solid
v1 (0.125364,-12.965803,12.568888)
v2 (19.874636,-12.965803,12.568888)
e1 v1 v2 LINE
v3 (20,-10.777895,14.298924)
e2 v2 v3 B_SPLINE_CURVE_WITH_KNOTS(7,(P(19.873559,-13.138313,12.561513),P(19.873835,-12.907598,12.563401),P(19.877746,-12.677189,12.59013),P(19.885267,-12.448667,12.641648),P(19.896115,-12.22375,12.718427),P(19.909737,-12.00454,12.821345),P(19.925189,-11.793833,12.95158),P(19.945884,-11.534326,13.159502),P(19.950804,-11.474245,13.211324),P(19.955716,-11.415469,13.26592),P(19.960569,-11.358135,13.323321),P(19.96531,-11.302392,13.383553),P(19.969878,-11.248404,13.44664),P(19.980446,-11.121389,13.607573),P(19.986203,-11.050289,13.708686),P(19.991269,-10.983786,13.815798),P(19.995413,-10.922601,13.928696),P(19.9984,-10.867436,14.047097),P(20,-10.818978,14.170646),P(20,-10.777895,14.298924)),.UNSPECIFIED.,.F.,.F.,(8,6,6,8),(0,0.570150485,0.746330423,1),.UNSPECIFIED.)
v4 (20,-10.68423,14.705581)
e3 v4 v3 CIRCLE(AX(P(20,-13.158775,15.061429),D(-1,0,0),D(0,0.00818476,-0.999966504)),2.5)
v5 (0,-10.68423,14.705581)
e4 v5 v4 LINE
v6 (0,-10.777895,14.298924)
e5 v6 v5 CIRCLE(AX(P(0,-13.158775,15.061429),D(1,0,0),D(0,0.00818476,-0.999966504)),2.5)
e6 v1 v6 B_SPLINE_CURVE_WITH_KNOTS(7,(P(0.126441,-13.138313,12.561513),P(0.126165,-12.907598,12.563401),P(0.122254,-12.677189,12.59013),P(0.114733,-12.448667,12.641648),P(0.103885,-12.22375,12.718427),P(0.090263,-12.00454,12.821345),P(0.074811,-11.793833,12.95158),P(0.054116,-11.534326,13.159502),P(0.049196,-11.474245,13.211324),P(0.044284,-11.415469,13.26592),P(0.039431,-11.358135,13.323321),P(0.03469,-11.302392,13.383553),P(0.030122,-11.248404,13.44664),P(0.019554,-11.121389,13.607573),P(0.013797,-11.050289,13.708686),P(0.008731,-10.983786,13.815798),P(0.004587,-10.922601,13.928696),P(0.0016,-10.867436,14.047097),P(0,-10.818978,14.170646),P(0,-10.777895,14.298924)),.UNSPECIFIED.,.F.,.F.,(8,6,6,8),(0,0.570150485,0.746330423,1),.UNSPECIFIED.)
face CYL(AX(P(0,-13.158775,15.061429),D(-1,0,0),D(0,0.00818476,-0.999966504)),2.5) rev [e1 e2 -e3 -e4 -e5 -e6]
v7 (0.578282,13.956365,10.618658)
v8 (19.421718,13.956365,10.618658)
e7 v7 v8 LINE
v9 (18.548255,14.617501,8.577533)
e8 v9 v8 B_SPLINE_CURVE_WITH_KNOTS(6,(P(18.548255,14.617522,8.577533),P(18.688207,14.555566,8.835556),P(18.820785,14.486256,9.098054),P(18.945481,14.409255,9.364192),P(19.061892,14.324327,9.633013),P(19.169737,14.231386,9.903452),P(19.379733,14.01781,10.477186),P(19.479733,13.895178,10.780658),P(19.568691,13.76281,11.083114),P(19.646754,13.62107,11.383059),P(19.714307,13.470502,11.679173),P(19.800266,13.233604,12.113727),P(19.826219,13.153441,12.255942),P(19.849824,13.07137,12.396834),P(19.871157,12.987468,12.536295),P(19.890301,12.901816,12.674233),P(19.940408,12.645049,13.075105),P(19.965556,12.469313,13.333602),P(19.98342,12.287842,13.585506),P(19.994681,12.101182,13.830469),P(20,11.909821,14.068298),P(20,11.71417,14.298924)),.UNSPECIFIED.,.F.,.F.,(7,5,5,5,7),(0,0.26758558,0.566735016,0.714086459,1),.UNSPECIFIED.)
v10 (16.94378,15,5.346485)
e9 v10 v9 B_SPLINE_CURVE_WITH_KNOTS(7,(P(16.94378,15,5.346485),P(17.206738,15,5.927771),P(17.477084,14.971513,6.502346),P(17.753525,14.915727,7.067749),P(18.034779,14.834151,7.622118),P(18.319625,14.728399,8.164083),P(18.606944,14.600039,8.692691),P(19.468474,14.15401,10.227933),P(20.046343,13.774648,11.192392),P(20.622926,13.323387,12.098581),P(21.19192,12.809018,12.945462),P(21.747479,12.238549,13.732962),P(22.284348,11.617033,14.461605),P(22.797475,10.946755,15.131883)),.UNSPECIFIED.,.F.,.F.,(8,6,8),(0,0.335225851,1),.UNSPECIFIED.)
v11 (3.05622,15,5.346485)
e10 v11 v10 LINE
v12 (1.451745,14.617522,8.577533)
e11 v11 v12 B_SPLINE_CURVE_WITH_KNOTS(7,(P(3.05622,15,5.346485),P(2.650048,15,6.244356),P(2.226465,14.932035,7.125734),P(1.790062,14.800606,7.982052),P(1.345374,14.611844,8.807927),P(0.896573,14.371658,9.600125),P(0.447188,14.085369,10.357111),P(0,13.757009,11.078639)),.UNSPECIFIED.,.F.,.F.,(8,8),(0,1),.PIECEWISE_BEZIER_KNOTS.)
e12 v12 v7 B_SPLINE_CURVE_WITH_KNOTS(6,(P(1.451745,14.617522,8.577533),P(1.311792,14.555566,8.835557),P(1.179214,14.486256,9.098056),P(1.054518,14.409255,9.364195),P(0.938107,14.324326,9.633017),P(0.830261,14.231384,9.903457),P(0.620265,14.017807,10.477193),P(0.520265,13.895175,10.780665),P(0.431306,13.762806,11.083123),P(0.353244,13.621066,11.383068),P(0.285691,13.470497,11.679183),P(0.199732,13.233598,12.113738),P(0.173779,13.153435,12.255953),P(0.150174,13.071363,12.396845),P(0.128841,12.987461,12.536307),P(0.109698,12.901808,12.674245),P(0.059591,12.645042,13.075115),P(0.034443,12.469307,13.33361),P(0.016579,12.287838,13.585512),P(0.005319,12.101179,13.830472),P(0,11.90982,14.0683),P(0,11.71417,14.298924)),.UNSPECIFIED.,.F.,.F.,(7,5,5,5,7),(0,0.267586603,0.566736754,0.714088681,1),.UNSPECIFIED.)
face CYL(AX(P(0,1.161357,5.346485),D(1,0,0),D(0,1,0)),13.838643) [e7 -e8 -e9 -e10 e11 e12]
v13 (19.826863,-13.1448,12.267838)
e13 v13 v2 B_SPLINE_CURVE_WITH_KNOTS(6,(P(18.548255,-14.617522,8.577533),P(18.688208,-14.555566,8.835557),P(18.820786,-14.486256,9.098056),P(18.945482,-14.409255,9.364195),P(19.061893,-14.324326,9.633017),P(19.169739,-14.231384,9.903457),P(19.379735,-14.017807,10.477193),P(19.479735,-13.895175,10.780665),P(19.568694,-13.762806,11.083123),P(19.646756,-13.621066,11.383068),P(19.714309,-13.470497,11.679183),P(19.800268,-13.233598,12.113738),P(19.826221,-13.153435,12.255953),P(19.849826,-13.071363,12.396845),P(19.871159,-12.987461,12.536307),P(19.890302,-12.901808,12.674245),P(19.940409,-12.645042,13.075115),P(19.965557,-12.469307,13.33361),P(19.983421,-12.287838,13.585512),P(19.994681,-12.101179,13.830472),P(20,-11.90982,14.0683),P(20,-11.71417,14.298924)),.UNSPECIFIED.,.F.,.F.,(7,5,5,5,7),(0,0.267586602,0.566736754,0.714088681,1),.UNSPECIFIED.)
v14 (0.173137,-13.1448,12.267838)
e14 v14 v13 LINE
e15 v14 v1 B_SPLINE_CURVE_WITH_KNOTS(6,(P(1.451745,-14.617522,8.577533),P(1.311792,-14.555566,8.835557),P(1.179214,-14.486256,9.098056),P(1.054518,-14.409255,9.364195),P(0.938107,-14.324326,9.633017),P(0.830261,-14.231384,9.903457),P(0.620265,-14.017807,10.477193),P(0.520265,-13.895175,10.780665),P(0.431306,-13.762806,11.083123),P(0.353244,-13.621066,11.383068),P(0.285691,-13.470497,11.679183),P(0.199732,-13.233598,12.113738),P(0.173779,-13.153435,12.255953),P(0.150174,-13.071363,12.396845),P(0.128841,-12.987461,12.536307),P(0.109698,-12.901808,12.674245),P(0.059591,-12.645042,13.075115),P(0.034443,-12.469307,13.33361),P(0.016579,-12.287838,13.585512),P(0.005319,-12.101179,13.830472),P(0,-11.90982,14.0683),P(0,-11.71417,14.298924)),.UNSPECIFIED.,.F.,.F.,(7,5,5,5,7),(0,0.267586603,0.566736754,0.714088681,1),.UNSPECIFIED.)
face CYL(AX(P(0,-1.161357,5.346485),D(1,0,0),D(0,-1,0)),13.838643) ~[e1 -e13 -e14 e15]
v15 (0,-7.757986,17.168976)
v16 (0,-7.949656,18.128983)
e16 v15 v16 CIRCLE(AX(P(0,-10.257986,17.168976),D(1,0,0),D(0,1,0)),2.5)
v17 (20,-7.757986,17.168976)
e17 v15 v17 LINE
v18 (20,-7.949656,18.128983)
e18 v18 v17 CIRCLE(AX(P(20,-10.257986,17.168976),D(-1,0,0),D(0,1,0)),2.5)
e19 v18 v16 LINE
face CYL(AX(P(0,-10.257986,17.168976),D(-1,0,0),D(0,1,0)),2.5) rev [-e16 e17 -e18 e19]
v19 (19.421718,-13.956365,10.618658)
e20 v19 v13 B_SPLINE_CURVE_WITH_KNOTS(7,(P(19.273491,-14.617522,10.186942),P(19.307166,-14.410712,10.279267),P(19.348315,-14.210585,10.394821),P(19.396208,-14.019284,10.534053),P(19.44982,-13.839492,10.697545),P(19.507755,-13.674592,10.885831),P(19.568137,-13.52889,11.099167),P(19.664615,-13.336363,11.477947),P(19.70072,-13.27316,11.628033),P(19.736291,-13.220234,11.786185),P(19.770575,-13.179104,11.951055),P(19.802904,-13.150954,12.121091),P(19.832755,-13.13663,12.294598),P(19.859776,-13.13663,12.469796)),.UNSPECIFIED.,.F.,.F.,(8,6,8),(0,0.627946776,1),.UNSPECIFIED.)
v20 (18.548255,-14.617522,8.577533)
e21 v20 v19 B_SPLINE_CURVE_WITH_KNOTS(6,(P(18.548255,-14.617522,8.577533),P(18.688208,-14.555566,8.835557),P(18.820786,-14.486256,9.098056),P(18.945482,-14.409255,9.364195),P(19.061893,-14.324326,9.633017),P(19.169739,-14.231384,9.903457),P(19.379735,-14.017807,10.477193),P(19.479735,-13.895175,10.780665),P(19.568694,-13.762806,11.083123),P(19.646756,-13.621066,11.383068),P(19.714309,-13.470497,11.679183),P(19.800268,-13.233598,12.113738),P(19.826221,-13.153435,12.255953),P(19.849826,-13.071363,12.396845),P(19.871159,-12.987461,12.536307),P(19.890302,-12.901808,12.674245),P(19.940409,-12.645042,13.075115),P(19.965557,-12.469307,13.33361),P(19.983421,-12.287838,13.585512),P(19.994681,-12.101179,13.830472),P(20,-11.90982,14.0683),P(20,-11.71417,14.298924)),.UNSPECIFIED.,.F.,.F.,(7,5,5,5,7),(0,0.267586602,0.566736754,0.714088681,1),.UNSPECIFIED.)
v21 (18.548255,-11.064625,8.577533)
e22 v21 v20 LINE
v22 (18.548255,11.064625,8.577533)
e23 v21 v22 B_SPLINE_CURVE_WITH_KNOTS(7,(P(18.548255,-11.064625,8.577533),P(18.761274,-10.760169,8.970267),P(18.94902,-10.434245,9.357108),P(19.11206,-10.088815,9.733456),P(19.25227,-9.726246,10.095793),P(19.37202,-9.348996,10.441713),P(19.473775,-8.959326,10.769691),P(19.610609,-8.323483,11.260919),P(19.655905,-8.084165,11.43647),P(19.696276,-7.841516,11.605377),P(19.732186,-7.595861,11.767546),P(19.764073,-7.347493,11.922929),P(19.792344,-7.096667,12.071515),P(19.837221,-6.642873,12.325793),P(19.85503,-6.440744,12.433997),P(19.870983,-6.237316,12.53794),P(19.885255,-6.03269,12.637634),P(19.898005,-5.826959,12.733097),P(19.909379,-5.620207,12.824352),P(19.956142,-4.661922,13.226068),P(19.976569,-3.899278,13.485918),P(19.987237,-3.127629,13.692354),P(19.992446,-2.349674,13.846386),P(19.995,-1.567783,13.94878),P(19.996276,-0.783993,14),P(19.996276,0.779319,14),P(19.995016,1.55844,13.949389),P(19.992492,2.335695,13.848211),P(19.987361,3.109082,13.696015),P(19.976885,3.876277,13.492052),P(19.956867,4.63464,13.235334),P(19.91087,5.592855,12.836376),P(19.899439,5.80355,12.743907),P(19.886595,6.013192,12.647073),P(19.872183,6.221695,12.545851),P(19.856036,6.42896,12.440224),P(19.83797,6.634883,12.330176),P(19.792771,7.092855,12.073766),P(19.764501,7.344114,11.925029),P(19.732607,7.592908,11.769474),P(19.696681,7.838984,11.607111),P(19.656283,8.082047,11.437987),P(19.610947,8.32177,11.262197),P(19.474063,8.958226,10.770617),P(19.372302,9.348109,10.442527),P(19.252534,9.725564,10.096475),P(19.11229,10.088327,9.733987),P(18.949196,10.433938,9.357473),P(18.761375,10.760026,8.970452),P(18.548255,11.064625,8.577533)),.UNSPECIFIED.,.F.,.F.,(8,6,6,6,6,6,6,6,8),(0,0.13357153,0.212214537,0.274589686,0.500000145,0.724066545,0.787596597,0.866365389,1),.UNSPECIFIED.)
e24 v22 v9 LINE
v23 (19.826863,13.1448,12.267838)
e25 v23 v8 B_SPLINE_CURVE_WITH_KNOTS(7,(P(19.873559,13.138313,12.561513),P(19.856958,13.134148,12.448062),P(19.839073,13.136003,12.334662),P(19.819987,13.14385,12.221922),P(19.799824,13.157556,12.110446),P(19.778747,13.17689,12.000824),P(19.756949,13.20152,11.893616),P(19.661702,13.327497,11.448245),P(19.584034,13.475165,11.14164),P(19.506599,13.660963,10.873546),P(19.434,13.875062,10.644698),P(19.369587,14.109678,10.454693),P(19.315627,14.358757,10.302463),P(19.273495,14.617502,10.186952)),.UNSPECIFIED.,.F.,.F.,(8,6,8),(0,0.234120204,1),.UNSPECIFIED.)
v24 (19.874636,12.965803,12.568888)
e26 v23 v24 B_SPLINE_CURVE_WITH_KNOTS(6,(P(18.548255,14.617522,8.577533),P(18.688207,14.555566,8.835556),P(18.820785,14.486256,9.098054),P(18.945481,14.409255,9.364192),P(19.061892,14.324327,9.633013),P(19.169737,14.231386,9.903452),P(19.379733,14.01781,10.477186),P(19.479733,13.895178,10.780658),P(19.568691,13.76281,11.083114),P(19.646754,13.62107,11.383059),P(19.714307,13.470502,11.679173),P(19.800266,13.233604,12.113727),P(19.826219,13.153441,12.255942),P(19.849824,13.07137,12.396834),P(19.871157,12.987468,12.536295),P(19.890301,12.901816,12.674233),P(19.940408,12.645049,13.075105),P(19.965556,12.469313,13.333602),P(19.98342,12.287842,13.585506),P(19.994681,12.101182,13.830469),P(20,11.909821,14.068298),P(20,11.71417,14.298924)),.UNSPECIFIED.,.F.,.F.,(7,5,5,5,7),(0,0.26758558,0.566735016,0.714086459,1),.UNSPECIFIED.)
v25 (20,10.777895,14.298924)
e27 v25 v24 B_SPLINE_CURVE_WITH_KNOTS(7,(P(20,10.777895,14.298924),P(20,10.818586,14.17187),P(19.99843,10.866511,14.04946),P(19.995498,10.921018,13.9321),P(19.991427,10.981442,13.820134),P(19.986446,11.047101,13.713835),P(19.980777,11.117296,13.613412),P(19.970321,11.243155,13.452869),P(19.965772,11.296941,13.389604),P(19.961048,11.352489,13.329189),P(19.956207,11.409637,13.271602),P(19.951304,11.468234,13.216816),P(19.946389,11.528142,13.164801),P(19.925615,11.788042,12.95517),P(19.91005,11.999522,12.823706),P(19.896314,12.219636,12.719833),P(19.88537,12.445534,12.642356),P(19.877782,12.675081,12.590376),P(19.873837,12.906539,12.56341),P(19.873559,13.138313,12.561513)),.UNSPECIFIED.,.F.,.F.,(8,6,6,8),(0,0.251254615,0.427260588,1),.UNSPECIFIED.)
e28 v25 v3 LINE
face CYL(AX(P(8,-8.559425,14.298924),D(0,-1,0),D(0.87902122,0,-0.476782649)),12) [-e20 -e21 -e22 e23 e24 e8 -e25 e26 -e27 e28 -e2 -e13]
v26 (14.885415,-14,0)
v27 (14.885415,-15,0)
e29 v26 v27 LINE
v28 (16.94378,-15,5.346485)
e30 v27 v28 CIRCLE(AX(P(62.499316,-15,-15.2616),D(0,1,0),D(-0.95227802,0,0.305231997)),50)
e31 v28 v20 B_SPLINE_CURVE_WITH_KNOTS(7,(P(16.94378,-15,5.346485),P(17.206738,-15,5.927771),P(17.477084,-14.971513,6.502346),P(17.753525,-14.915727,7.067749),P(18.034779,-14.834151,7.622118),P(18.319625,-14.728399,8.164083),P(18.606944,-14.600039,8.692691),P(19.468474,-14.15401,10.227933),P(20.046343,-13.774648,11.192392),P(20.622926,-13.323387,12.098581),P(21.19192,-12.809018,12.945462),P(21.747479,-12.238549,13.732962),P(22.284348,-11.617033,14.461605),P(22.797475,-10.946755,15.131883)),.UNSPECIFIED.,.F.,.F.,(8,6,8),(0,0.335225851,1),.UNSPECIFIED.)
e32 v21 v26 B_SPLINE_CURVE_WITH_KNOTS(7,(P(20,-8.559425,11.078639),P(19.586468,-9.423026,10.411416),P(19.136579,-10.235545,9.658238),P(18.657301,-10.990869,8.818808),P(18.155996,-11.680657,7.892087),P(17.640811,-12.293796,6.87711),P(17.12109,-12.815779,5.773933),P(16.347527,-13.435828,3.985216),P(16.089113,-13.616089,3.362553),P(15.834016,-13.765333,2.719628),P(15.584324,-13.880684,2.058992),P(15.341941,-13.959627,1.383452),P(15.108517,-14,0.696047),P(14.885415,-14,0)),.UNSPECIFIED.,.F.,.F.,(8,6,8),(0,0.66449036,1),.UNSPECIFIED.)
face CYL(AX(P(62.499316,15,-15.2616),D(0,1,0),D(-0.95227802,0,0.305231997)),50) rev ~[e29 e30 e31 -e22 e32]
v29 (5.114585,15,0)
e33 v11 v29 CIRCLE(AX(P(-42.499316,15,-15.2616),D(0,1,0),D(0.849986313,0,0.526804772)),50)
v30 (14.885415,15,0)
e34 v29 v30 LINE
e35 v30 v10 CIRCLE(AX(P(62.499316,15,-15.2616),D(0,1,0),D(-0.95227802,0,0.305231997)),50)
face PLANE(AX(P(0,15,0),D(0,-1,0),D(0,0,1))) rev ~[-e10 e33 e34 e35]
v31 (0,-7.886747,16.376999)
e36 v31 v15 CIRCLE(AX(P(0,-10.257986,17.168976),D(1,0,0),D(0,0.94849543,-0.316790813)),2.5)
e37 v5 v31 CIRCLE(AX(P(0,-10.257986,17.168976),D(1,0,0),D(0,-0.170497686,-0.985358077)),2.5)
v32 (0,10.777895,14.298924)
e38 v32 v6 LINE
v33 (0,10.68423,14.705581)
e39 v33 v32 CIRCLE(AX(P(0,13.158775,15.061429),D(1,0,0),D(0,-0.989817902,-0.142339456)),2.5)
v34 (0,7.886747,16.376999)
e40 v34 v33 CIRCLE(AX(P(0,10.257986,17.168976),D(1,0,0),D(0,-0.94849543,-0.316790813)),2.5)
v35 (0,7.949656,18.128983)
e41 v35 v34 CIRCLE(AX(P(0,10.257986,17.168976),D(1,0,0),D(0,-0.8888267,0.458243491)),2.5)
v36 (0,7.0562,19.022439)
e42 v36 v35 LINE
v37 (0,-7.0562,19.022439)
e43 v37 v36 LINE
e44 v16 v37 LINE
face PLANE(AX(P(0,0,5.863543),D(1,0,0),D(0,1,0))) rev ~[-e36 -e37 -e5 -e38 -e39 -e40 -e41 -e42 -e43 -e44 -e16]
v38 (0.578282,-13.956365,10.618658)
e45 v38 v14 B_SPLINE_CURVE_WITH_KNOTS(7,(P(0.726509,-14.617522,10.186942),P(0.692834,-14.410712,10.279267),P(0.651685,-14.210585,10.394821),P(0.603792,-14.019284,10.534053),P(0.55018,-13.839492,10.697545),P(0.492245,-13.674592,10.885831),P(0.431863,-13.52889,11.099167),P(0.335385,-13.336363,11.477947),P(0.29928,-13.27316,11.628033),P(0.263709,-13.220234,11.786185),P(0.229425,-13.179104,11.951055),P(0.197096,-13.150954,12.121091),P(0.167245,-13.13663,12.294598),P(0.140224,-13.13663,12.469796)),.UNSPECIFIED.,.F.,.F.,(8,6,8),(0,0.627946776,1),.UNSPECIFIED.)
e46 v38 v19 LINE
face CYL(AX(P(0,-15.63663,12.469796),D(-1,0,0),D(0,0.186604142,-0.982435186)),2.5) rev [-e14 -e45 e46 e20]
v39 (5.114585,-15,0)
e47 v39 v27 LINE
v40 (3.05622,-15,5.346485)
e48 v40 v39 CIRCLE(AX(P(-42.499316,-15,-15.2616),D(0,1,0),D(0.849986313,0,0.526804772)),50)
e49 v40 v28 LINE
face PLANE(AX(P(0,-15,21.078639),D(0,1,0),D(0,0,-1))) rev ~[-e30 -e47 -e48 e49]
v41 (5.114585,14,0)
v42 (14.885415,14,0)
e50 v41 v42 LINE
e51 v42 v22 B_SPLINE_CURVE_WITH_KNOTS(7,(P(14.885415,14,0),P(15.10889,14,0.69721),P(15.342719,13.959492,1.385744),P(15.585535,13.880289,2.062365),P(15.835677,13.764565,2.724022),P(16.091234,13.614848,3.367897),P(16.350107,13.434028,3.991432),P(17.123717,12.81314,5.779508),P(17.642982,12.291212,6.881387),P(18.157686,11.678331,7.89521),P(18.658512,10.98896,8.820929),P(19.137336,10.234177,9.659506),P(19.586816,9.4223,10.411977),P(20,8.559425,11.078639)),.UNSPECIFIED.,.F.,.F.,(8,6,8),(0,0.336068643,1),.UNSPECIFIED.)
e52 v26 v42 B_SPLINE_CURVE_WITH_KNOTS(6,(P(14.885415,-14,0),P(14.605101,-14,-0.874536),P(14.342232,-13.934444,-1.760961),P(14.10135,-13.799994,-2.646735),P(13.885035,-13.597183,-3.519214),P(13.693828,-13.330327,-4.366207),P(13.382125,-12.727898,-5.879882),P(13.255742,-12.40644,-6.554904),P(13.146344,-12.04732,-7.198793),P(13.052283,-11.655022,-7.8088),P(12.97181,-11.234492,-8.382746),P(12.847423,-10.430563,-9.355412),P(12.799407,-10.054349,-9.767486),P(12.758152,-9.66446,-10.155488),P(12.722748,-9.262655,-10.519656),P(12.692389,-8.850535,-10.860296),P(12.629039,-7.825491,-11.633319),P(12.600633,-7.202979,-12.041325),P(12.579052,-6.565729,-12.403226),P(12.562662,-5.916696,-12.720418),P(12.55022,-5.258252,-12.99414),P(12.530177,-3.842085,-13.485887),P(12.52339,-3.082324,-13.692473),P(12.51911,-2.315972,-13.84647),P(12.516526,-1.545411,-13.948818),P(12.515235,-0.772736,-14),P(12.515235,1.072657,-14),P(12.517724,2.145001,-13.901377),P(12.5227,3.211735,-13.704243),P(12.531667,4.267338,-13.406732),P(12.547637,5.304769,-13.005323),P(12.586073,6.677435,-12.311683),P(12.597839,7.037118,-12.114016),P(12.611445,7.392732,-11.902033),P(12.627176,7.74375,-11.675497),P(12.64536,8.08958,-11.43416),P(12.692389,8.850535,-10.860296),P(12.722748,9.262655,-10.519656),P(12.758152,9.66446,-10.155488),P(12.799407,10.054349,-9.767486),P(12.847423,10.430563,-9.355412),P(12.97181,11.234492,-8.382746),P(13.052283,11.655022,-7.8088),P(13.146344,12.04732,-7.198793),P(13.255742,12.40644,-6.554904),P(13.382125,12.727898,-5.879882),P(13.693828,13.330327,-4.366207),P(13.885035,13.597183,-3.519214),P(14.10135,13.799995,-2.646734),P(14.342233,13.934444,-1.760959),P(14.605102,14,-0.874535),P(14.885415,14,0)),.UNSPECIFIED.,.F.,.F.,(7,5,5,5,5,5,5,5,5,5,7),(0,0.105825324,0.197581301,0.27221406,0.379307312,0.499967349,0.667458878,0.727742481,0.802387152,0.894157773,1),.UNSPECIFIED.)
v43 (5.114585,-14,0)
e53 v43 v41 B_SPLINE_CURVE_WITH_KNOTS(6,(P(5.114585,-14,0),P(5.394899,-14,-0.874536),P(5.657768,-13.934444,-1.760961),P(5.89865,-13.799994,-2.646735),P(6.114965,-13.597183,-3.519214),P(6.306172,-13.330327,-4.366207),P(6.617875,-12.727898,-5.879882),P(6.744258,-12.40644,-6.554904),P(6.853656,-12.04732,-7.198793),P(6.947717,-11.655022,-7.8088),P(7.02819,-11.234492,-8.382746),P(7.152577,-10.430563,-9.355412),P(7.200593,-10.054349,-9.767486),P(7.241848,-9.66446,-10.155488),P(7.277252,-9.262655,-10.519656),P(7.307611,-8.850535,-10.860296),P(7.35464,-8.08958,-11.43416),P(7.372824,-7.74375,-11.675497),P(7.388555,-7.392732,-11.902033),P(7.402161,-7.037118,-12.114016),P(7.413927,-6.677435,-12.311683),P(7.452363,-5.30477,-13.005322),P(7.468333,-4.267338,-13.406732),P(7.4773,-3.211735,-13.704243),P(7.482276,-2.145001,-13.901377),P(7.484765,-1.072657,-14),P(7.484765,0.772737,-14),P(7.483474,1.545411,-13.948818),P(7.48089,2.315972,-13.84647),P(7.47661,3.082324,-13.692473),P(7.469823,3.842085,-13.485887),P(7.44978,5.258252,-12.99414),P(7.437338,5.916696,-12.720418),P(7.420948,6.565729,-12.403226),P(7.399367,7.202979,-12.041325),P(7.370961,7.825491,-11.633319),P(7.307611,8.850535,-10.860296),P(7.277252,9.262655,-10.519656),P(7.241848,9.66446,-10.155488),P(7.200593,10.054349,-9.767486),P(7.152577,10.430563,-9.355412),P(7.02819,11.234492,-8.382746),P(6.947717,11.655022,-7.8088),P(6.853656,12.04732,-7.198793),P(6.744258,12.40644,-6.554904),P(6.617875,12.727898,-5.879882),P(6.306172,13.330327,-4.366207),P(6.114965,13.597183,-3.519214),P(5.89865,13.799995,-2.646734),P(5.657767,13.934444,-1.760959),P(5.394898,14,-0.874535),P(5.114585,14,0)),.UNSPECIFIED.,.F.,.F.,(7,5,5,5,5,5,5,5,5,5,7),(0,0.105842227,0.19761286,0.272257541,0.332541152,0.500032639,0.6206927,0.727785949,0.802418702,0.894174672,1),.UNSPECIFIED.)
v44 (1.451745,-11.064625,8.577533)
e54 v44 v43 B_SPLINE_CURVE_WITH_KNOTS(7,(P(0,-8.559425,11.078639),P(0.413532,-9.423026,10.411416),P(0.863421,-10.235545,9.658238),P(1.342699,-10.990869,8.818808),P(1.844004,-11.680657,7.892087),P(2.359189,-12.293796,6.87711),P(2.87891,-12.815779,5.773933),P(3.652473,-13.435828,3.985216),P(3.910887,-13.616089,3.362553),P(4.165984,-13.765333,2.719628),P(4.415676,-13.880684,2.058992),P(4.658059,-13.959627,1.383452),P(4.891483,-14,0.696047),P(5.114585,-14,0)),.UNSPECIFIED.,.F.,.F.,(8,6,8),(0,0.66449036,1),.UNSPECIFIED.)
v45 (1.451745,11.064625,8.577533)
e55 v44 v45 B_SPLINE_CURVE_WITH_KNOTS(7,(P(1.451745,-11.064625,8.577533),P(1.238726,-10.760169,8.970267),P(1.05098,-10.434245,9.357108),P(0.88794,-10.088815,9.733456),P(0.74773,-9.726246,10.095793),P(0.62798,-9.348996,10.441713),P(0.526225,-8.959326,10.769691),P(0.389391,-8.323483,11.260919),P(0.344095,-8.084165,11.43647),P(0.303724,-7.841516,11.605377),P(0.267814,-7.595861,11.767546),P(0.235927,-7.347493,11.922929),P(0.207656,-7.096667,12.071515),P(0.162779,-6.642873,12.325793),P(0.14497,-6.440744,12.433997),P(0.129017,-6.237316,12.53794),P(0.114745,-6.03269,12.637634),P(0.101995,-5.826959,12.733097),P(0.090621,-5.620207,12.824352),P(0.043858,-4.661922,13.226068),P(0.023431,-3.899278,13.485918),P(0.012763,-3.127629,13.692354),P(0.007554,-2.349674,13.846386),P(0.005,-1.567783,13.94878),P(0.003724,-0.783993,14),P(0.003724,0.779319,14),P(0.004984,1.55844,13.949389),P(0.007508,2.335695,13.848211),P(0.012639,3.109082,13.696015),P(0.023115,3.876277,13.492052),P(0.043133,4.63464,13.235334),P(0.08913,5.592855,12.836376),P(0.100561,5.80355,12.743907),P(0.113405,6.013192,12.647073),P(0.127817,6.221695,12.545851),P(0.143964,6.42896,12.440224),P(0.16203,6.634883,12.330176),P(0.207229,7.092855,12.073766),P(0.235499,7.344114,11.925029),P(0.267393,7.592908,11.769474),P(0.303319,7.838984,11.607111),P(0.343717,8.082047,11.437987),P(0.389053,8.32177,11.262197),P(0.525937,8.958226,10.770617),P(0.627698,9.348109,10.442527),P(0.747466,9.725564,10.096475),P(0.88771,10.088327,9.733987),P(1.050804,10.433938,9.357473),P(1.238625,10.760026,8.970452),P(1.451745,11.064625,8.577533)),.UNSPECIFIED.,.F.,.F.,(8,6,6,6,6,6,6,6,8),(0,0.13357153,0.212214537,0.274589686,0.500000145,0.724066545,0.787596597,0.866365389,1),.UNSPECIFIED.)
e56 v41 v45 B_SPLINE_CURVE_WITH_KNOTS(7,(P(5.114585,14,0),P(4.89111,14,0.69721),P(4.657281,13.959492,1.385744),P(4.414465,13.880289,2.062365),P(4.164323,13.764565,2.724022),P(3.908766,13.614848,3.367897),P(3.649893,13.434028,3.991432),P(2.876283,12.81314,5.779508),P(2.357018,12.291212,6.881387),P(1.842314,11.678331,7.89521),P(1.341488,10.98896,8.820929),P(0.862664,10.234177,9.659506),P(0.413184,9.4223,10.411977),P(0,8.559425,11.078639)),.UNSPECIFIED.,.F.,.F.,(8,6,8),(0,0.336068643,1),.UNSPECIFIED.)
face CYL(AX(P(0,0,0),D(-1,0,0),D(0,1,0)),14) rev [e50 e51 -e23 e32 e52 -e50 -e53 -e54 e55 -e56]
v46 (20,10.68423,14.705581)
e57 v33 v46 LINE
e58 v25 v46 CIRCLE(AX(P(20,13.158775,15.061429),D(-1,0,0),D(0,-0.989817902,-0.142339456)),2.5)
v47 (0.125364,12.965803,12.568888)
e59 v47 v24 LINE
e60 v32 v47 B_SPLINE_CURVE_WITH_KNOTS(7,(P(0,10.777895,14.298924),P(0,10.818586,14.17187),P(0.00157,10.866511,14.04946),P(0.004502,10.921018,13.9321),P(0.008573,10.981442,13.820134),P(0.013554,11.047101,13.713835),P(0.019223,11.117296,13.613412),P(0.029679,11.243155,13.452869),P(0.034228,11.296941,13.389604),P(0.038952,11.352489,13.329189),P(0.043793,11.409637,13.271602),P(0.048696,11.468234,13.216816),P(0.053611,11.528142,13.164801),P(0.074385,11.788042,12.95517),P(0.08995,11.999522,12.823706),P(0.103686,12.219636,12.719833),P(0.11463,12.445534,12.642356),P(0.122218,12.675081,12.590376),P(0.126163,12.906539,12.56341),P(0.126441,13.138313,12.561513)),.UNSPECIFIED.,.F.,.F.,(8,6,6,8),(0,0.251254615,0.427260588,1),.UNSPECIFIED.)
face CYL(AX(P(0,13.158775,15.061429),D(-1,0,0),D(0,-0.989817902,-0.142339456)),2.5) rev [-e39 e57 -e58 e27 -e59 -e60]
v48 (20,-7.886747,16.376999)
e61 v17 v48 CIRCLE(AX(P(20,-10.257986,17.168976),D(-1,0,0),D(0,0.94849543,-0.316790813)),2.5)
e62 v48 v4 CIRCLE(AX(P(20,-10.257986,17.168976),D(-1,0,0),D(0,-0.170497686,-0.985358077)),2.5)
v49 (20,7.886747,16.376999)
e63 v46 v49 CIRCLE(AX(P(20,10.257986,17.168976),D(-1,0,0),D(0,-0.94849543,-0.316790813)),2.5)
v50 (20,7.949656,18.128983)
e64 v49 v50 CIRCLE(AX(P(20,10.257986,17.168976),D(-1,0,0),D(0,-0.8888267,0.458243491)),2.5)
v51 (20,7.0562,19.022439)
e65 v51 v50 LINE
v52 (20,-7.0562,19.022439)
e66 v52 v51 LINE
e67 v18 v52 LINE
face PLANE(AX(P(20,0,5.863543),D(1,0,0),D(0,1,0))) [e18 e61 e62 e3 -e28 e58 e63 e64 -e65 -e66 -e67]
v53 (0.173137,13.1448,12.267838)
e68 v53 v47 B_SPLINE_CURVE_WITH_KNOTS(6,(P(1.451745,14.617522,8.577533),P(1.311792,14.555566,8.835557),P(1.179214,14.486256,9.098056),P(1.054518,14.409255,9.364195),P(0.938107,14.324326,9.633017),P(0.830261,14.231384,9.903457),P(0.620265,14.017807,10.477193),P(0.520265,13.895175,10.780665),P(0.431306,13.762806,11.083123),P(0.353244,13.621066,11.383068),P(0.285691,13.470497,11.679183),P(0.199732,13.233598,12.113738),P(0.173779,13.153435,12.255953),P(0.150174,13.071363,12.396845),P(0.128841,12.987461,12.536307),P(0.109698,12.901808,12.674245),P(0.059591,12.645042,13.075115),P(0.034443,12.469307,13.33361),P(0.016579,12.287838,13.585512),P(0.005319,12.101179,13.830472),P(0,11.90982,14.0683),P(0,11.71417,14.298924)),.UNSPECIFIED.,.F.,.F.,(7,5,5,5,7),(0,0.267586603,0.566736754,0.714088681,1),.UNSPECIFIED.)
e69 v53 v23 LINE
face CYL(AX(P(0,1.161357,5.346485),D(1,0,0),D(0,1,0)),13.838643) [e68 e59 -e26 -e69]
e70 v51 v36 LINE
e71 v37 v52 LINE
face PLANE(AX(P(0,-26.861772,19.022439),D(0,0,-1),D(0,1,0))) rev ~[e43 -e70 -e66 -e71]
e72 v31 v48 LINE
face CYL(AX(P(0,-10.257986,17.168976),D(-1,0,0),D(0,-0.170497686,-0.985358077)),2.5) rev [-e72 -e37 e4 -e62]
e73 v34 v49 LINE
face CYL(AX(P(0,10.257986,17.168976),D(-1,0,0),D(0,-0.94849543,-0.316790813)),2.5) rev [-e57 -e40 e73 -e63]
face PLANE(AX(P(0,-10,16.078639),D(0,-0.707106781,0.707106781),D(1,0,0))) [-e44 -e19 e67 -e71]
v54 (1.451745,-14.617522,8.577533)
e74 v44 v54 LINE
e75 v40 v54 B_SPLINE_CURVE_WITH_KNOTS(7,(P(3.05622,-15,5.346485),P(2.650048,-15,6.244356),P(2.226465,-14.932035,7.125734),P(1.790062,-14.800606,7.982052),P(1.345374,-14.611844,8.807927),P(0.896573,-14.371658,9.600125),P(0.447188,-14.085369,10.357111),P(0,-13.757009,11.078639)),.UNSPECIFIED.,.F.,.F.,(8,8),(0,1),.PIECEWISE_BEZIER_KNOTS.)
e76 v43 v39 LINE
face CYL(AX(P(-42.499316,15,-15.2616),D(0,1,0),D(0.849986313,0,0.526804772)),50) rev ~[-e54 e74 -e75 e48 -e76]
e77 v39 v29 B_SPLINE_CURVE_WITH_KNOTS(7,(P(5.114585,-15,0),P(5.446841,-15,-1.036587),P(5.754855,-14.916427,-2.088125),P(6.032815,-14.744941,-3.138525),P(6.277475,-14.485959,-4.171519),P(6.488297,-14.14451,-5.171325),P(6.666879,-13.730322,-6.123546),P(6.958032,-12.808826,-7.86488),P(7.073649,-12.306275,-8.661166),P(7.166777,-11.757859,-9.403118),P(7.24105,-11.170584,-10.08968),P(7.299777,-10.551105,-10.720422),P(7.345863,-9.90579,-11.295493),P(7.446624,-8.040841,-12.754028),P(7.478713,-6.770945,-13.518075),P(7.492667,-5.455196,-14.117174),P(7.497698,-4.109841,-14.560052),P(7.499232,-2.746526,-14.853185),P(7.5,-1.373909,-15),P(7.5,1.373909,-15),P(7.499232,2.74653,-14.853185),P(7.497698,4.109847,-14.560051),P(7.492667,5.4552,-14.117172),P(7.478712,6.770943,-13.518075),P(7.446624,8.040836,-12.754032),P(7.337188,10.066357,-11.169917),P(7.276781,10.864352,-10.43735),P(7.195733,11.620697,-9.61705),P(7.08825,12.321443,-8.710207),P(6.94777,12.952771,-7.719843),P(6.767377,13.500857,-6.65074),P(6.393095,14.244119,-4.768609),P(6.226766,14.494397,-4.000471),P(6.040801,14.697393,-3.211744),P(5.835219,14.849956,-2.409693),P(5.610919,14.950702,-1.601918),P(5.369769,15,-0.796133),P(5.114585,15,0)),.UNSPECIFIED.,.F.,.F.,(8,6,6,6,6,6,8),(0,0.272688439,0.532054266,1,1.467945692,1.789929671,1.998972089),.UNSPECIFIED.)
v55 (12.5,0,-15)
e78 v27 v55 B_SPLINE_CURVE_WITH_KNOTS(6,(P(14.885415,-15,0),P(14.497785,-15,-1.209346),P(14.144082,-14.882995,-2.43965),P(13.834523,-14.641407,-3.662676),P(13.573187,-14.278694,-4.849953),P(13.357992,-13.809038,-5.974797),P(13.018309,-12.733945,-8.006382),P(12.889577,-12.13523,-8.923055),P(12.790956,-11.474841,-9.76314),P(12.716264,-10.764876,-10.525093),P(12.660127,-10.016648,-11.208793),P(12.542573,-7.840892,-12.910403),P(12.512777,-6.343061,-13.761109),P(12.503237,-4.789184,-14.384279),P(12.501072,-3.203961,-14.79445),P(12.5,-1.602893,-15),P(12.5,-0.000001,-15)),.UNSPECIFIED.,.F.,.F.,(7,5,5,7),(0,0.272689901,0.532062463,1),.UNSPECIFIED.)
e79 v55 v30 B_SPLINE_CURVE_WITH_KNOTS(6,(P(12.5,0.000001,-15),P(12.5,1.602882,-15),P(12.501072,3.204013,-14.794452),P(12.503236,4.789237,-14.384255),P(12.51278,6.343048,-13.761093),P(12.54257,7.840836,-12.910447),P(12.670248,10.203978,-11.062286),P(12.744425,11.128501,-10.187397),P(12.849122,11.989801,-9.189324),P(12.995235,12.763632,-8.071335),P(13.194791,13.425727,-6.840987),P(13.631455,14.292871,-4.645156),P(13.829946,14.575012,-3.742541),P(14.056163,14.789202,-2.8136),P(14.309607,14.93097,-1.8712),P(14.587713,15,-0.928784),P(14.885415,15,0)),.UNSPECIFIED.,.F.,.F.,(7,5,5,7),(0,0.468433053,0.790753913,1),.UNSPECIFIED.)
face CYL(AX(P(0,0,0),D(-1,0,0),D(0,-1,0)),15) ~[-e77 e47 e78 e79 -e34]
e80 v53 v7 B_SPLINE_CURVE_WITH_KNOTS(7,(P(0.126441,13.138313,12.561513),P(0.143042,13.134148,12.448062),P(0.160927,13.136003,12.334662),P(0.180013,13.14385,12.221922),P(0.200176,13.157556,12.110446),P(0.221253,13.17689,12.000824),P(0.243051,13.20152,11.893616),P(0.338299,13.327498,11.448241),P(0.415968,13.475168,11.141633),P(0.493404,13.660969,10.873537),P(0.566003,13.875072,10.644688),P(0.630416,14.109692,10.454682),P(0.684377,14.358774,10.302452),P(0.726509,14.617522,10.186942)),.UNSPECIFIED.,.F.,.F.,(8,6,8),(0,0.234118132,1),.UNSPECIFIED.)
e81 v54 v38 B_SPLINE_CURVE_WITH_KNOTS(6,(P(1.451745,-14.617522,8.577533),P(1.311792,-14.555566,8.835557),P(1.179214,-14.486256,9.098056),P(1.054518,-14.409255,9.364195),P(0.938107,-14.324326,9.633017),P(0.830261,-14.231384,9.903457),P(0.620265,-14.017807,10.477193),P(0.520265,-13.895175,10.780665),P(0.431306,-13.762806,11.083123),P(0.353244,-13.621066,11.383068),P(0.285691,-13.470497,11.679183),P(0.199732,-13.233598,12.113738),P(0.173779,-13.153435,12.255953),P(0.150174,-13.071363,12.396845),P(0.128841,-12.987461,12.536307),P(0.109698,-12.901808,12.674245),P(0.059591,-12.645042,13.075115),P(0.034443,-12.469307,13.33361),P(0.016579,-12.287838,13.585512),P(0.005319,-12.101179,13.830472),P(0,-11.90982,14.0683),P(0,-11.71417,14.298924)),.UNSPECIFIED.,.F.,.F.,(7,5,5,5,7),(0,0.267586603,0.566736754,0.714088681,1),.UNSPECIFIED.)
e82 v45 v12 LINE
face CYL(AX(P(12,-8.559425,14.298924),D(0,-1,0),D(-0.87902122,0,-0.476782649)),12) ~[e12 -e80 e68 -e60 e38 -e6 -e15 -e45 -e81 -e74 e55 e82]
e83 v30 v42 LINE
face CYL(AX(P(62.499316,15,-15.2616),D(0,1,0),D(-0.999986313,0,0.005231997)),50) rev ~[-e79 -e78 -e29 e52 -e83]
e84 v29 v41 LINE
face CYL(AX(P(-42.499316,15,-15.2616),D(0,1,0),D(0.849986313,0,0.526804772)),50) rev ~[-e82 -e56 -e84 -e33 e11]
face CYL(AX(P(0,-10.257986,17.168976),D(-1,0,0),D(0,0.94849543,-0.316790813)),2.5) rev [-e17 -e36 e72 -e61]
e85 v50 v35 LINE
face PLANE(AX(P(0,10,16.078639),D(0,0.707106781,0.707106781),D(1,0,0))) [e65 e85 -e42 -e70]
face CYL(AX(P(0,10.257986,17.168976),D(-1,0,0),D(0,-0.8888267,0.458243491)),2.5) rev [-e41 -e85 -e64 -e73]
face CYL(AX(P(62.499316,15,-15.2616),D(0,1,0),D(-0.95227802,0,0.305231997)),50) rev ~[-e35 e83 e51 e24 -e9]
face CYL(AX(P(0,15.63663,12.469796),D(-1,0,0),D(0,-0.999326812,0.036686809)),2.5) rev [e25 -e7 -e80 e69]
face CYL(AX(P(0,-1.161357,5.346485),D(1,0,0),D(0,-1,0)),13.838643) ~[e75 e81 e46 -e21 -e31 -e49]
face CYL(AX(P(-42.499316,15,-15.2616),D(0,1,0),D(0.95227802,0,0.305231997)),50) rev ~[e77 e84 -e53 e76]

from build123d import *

# Parameters (mm, degrees)
F0_R      = 14
F1_DEPTH  = 20
F2_SIZE   = 10
F4_DEPTH  = 38.6586394161
F5_R      = 13.8386431078
F6_F1_R   = 12
F6_F2_R   = 12
F7_W      = 49.8866699636
F7_H      = 41.0156846046
F8_DEPTH  = 38.5990254581
F10_DEPTH = 25


with BuildPart() as f1:
    # F0 (on Right) → F1 (new body)
    with BuildSketch(Plane.YZ):
        with BuildLine():
            Line((-15, 21.0786387324), (-15, 0))
            ThreePointArc((-15, 0), (0, -15), (15, 0))
            Line((15, 0), (15, 21.0786387324))
            Line((15, 21.0786387324), (-15, 21.0786387324))
        make_face()
        Circle(F0_R, mode=Mode.SUBTRACT)
    extrude(amount=F1_DEPTH)

    # F2
    f2_edges = [f1.edges().sort_by_distance(p)[0] for p in [
        (10, -15, 21.078639),
        (10, 15, 21.078639),
    ]]
    chamfer(f2_edges, length=F2_SIZE)

    # F3 (on face) → F4 (cut)
    with BuildSketch(Plane(origin=(0, 15, 0), x_dir=(-1, 0, 0), z_dir=(0, 1, 0))):
        with BuildLine():
            Line((-5.1145853621, 0), (0, 0))
            Line((0, 0), (0, 11.0786387324))
            ThreePointArc((0, 11.0786387324), (-2.8965213104, 5.6959282984), (-5.1145853621, 0))
        make_face()
        with BuildLine():
            Line((-20, 0), (-14.8854146379, 0))
            ThreePointArc((-14.8854146379, 0), (-17.1034786896, 5.6959282984), (-20, 11.0786387324))
            Line((-20, 11.0786387324), (-20, 0))
        make_face()
        with BuildLine():
            Line((-20, -15), (-12.5, -15))
            ThreePointArc((-12.5, -15), (-13.1198156851, -7.4088943941), (-14.8854146379, 0))
            Line((-14.8854146379, 0), (-20, 0))
            Line((-20, 0), (-20, -15))
        make_face()
        with BuildLine():
            Line((-7.5, -15), (0, -15))
            Line((0, -15), (0, 0))
            Line((0, 0), (-5.1145853621, 0))
            ThreePointArc((-5.1145853621, 0), (-6.8801843149, -7.4088943941), (-7.5, -15))
        make_face()
    extrude(amount=-F4_DEPTH, mode=Mode.SUBTRACT)

    # F5
    f5_edges = [f1.edges().sort_by_distance(p)[0] for p in [
        (10, 15, 11.078639),
        (10, -15, 11.078639),
    ]]
    fillet(f5_edges, radius=F5_R)

    # F6: fillet of radius 12 on 4 edges, made by hand

    # F6_f1
    f6_f1_edges = [f1.edges().sort_by_distance(p)[0] for p in [
        (0, -11.1582173276, 11.0786387324),
    ]]
    fillet(f6_f1_edges, radius=F6_F1_R)

    # F6_f2
    f6_f2_edges = [f1.edges().sort_by_distance(p)[0] for p in [
        (20, -11.1582173276, 11.0786387324),
    ]]
    fillet(f6_f2_edges, radius=F6_F2_R)

    # F7 (on Right) → F8 (cut, symmetric)
    with BuildSketch(Plane.YZ):
        with Locations((-1.9184369594, 39.5302809775)):
            Rectangle(F7_W, F7_H)
    extrude(amount=F8_DEPTH, both=True, mode=Mode.SUBTRACT)

    # F9 (on Right) → F10 (cut)
    with BuildSketch(Plane.YZ):
        with BuildLine():
            ThreePointArc((13.1383126183, 12.5615130593), (13.6820509432, 10.9110715325), (15.1701192952, 10.0137080727))
            ThreePointArc((15.1701192952, 10.0137080727), (15.5705478949, 10.9205773773), (16.2919620049, 11.6005161105))
            ThreePointArc((16.2919620049, 11.6005161105), (15.6366296494, 12.4697960372), (14.9349695532, 13.3021308235))
            ThreePointArc((14.9349695532, 13.3021308235), (14.111548562, 12.7501046734), (13.1383126183, 12.5615130593))
        make_face()
        with BuildLine():
            ThreePointArc((10.6842297635, 14.7055806807), (11.5139277039, 13.1787506551), (13.1383126183, 12.5615130593))
            ThreePointArc((13.1383126183, 12.5615130593), (13.3703783986, 13.5253078885), (13.9587913382, 14.3231331899))
            ThreePointArc((13.9587913382, 14.3231331899), (13.1587745188, 15.0614293201), (12.3197712741, 15.755101896))
            ThreePointArc((12.3197712741, 15.755101896), (11.6081510723, 15.0649195379), (10.6842297635, 14.7055806807))
        make_face()
        with BuildLine():
            ThreePointArc((11.1769736326, 16.5853929835), (10.7404739393, 15.6953238755), (10.6842297635, 14.7055806807))
            ThreePointArc((10.6842297635, 14.7055806807), (11.6081510723, 15.0649195379), (12.3197712741, 15.755101896))
            ThreePointArc((12.3197712741, 15.755101896), (11.7557050458, 16.1803398875), (11.1769736326, 16.5853929835))
        make_face()
        with BuildLine():
            ThreePointArc((7.8867469732, 16.3769988391), (8.9757373546, 15.022853888), (10.6842297635, 14.7055806807))
            ThreePointArc((10.6842297635, 14.7055806807), (10.7404739393, 15.6953238755), (11.1769736326, 16.5853929835))
            ThreePointArc((11.1769736326, 16.5853929835), (10.2579855481, 17.168975872), (9.3086054096, 17.7016910302))
            ThreePointArc((9.3086054096, 17.7016910302), (8.7316580559, 16.895535493), (7.8867469732, 16.3769988391))
        make_face()
        with BuildLine():
            ThreePointArc((8.0359187979, 18.3145846001), (7.7653618104, 17.3608792391), (7.8867469732, 16.3769988391))
            ThreePointArc((7.8867469732, 16.3769988391), (8.7316580559, 16.895535493), (9.3086054096, 17.7016910302))
            ThreePointArc((9.3086054096, 17.7016910302), (8.6776747824, 18.019377358), (8.0359187979, 18.3145846001))
        make_face()
        with BuildLine():
            ThreePointArc((-9.3086054096, 17.7016910302), (-8.7316580559, 16.895535493), (-7.8867469732, 16.3769988391))
            ThreePointArc((-7.8867469732, 16.3769988391), (-7.7903858604, 16.7677879095), (-7.7579855481, 17.168975872))
            ThreePointArc((-7.7579855481, 17.168975872), (-7.8284622538, 17.758396403), (-8.0359187979, 18.3145846001))
            ThreePointArc((-8.0359187979, 18.3145846001), (-8.6776747824, 18.019377358), (-9.3086054096, 17.7016910302))
        make_face()
        with BuildLine():
            ThreePointArc((-10.6842297635, 14.7055806807), (-8.9757373546, 15.022853888), (-7.8867469732, 16.3769988391))
            ThreePointArc((-7.8867469732, 16.3769988391), (-8.7316580559, 16.895535493), (-9.3086054096, 17.7016910302))
            ThreePointArc((-9.3086054096, 17.7016910302), (-10.2579855481, 17.168975872), (-11.1769736326, 16.5853929835))
            ThreePointArc((-11.1769736326, 16.5853929835), (-10.79186702, 15.8662578063), (-10.6587745188, 15.0614293201))
            ThreePointArc((-10.6587745188, 15.0614293201), (-10.6651464503, 14.883050353), (-10.6842297635, 14.7055806807))
        make_face()
        with BuildLine():
            ThreePointArc((-12.3197712741, 15.755101896), (-11.6081510723, 15.0649195379), (-10.6842297635, 14.7055806807))
            ThreePointArc((-10.6842297635, 14.7055806807), (-10.6651464503, 14.883050353), (-10.6587745188, 15.0614293201))
            ThreePointArc((-10.6587745188, 15.0614293201), (-10.79186702, 15.8662578063), (-11.1769736326, 16.5853929835))
            ThreePointArc((-11.1769736326, 16.5853929835), (-11.7557050458, 16.1803398875), (-12.3197712741, 15.755101896))
        make_face()
        with BuildLine():
            ThreePointArc((-13.1383126183, 12.5615130593), (-11.5139277039, 13.1787506551), (-10.6842297635, 14.7055806807))
            ThreePointArc((-10.6842297635, 14.7055806807), (-11.6081510723, 15.0649195379), (-12.3197712741, 15.755101896))
            ThreePointArc((-12.3197712741, 15.755101896), (-13.1587745188, 15.0614293201), (-13.9587913382, 14.3231331899))
            ThreePointArc((-13.9587913382, 14.3231331899), (-13.3703783986, 13.5253078885), (-13.1383126183, 12.5615130593))
        make_face()
        with BuildLine():
            ThreePointArc((-13.1366296494, 12.4697960372), (-13.137050427, 12.5156622681), (-13.1383126183, 12.5615130593))
            ThreePointArc((-13.1383126183, 12.5615130593), (-14.111548562, 12.7501046734), (-14.9349695532, 13.3021308235))
            ThreePointArc((-14.9349695532, 13.3021308235), (-15.6366296494, 12.4697960372), (-16.2919620049, 11.6005161105))
            ThreePointArc((-16.2919620049, 11.6005161105), (-15.5705478949, 10.9205773773), (-15.1701192952, 10.0137080727))
            ThreePointArc((-15.1701192952, 10.0137080727), (-13.7109770476, 10.8754742198), (-13.1366296494, 12.4697960372))
        make_face()
    extrude(amount=F10_DEPTH, mode=Mode.SUBTRACT)


solid = f1.part
